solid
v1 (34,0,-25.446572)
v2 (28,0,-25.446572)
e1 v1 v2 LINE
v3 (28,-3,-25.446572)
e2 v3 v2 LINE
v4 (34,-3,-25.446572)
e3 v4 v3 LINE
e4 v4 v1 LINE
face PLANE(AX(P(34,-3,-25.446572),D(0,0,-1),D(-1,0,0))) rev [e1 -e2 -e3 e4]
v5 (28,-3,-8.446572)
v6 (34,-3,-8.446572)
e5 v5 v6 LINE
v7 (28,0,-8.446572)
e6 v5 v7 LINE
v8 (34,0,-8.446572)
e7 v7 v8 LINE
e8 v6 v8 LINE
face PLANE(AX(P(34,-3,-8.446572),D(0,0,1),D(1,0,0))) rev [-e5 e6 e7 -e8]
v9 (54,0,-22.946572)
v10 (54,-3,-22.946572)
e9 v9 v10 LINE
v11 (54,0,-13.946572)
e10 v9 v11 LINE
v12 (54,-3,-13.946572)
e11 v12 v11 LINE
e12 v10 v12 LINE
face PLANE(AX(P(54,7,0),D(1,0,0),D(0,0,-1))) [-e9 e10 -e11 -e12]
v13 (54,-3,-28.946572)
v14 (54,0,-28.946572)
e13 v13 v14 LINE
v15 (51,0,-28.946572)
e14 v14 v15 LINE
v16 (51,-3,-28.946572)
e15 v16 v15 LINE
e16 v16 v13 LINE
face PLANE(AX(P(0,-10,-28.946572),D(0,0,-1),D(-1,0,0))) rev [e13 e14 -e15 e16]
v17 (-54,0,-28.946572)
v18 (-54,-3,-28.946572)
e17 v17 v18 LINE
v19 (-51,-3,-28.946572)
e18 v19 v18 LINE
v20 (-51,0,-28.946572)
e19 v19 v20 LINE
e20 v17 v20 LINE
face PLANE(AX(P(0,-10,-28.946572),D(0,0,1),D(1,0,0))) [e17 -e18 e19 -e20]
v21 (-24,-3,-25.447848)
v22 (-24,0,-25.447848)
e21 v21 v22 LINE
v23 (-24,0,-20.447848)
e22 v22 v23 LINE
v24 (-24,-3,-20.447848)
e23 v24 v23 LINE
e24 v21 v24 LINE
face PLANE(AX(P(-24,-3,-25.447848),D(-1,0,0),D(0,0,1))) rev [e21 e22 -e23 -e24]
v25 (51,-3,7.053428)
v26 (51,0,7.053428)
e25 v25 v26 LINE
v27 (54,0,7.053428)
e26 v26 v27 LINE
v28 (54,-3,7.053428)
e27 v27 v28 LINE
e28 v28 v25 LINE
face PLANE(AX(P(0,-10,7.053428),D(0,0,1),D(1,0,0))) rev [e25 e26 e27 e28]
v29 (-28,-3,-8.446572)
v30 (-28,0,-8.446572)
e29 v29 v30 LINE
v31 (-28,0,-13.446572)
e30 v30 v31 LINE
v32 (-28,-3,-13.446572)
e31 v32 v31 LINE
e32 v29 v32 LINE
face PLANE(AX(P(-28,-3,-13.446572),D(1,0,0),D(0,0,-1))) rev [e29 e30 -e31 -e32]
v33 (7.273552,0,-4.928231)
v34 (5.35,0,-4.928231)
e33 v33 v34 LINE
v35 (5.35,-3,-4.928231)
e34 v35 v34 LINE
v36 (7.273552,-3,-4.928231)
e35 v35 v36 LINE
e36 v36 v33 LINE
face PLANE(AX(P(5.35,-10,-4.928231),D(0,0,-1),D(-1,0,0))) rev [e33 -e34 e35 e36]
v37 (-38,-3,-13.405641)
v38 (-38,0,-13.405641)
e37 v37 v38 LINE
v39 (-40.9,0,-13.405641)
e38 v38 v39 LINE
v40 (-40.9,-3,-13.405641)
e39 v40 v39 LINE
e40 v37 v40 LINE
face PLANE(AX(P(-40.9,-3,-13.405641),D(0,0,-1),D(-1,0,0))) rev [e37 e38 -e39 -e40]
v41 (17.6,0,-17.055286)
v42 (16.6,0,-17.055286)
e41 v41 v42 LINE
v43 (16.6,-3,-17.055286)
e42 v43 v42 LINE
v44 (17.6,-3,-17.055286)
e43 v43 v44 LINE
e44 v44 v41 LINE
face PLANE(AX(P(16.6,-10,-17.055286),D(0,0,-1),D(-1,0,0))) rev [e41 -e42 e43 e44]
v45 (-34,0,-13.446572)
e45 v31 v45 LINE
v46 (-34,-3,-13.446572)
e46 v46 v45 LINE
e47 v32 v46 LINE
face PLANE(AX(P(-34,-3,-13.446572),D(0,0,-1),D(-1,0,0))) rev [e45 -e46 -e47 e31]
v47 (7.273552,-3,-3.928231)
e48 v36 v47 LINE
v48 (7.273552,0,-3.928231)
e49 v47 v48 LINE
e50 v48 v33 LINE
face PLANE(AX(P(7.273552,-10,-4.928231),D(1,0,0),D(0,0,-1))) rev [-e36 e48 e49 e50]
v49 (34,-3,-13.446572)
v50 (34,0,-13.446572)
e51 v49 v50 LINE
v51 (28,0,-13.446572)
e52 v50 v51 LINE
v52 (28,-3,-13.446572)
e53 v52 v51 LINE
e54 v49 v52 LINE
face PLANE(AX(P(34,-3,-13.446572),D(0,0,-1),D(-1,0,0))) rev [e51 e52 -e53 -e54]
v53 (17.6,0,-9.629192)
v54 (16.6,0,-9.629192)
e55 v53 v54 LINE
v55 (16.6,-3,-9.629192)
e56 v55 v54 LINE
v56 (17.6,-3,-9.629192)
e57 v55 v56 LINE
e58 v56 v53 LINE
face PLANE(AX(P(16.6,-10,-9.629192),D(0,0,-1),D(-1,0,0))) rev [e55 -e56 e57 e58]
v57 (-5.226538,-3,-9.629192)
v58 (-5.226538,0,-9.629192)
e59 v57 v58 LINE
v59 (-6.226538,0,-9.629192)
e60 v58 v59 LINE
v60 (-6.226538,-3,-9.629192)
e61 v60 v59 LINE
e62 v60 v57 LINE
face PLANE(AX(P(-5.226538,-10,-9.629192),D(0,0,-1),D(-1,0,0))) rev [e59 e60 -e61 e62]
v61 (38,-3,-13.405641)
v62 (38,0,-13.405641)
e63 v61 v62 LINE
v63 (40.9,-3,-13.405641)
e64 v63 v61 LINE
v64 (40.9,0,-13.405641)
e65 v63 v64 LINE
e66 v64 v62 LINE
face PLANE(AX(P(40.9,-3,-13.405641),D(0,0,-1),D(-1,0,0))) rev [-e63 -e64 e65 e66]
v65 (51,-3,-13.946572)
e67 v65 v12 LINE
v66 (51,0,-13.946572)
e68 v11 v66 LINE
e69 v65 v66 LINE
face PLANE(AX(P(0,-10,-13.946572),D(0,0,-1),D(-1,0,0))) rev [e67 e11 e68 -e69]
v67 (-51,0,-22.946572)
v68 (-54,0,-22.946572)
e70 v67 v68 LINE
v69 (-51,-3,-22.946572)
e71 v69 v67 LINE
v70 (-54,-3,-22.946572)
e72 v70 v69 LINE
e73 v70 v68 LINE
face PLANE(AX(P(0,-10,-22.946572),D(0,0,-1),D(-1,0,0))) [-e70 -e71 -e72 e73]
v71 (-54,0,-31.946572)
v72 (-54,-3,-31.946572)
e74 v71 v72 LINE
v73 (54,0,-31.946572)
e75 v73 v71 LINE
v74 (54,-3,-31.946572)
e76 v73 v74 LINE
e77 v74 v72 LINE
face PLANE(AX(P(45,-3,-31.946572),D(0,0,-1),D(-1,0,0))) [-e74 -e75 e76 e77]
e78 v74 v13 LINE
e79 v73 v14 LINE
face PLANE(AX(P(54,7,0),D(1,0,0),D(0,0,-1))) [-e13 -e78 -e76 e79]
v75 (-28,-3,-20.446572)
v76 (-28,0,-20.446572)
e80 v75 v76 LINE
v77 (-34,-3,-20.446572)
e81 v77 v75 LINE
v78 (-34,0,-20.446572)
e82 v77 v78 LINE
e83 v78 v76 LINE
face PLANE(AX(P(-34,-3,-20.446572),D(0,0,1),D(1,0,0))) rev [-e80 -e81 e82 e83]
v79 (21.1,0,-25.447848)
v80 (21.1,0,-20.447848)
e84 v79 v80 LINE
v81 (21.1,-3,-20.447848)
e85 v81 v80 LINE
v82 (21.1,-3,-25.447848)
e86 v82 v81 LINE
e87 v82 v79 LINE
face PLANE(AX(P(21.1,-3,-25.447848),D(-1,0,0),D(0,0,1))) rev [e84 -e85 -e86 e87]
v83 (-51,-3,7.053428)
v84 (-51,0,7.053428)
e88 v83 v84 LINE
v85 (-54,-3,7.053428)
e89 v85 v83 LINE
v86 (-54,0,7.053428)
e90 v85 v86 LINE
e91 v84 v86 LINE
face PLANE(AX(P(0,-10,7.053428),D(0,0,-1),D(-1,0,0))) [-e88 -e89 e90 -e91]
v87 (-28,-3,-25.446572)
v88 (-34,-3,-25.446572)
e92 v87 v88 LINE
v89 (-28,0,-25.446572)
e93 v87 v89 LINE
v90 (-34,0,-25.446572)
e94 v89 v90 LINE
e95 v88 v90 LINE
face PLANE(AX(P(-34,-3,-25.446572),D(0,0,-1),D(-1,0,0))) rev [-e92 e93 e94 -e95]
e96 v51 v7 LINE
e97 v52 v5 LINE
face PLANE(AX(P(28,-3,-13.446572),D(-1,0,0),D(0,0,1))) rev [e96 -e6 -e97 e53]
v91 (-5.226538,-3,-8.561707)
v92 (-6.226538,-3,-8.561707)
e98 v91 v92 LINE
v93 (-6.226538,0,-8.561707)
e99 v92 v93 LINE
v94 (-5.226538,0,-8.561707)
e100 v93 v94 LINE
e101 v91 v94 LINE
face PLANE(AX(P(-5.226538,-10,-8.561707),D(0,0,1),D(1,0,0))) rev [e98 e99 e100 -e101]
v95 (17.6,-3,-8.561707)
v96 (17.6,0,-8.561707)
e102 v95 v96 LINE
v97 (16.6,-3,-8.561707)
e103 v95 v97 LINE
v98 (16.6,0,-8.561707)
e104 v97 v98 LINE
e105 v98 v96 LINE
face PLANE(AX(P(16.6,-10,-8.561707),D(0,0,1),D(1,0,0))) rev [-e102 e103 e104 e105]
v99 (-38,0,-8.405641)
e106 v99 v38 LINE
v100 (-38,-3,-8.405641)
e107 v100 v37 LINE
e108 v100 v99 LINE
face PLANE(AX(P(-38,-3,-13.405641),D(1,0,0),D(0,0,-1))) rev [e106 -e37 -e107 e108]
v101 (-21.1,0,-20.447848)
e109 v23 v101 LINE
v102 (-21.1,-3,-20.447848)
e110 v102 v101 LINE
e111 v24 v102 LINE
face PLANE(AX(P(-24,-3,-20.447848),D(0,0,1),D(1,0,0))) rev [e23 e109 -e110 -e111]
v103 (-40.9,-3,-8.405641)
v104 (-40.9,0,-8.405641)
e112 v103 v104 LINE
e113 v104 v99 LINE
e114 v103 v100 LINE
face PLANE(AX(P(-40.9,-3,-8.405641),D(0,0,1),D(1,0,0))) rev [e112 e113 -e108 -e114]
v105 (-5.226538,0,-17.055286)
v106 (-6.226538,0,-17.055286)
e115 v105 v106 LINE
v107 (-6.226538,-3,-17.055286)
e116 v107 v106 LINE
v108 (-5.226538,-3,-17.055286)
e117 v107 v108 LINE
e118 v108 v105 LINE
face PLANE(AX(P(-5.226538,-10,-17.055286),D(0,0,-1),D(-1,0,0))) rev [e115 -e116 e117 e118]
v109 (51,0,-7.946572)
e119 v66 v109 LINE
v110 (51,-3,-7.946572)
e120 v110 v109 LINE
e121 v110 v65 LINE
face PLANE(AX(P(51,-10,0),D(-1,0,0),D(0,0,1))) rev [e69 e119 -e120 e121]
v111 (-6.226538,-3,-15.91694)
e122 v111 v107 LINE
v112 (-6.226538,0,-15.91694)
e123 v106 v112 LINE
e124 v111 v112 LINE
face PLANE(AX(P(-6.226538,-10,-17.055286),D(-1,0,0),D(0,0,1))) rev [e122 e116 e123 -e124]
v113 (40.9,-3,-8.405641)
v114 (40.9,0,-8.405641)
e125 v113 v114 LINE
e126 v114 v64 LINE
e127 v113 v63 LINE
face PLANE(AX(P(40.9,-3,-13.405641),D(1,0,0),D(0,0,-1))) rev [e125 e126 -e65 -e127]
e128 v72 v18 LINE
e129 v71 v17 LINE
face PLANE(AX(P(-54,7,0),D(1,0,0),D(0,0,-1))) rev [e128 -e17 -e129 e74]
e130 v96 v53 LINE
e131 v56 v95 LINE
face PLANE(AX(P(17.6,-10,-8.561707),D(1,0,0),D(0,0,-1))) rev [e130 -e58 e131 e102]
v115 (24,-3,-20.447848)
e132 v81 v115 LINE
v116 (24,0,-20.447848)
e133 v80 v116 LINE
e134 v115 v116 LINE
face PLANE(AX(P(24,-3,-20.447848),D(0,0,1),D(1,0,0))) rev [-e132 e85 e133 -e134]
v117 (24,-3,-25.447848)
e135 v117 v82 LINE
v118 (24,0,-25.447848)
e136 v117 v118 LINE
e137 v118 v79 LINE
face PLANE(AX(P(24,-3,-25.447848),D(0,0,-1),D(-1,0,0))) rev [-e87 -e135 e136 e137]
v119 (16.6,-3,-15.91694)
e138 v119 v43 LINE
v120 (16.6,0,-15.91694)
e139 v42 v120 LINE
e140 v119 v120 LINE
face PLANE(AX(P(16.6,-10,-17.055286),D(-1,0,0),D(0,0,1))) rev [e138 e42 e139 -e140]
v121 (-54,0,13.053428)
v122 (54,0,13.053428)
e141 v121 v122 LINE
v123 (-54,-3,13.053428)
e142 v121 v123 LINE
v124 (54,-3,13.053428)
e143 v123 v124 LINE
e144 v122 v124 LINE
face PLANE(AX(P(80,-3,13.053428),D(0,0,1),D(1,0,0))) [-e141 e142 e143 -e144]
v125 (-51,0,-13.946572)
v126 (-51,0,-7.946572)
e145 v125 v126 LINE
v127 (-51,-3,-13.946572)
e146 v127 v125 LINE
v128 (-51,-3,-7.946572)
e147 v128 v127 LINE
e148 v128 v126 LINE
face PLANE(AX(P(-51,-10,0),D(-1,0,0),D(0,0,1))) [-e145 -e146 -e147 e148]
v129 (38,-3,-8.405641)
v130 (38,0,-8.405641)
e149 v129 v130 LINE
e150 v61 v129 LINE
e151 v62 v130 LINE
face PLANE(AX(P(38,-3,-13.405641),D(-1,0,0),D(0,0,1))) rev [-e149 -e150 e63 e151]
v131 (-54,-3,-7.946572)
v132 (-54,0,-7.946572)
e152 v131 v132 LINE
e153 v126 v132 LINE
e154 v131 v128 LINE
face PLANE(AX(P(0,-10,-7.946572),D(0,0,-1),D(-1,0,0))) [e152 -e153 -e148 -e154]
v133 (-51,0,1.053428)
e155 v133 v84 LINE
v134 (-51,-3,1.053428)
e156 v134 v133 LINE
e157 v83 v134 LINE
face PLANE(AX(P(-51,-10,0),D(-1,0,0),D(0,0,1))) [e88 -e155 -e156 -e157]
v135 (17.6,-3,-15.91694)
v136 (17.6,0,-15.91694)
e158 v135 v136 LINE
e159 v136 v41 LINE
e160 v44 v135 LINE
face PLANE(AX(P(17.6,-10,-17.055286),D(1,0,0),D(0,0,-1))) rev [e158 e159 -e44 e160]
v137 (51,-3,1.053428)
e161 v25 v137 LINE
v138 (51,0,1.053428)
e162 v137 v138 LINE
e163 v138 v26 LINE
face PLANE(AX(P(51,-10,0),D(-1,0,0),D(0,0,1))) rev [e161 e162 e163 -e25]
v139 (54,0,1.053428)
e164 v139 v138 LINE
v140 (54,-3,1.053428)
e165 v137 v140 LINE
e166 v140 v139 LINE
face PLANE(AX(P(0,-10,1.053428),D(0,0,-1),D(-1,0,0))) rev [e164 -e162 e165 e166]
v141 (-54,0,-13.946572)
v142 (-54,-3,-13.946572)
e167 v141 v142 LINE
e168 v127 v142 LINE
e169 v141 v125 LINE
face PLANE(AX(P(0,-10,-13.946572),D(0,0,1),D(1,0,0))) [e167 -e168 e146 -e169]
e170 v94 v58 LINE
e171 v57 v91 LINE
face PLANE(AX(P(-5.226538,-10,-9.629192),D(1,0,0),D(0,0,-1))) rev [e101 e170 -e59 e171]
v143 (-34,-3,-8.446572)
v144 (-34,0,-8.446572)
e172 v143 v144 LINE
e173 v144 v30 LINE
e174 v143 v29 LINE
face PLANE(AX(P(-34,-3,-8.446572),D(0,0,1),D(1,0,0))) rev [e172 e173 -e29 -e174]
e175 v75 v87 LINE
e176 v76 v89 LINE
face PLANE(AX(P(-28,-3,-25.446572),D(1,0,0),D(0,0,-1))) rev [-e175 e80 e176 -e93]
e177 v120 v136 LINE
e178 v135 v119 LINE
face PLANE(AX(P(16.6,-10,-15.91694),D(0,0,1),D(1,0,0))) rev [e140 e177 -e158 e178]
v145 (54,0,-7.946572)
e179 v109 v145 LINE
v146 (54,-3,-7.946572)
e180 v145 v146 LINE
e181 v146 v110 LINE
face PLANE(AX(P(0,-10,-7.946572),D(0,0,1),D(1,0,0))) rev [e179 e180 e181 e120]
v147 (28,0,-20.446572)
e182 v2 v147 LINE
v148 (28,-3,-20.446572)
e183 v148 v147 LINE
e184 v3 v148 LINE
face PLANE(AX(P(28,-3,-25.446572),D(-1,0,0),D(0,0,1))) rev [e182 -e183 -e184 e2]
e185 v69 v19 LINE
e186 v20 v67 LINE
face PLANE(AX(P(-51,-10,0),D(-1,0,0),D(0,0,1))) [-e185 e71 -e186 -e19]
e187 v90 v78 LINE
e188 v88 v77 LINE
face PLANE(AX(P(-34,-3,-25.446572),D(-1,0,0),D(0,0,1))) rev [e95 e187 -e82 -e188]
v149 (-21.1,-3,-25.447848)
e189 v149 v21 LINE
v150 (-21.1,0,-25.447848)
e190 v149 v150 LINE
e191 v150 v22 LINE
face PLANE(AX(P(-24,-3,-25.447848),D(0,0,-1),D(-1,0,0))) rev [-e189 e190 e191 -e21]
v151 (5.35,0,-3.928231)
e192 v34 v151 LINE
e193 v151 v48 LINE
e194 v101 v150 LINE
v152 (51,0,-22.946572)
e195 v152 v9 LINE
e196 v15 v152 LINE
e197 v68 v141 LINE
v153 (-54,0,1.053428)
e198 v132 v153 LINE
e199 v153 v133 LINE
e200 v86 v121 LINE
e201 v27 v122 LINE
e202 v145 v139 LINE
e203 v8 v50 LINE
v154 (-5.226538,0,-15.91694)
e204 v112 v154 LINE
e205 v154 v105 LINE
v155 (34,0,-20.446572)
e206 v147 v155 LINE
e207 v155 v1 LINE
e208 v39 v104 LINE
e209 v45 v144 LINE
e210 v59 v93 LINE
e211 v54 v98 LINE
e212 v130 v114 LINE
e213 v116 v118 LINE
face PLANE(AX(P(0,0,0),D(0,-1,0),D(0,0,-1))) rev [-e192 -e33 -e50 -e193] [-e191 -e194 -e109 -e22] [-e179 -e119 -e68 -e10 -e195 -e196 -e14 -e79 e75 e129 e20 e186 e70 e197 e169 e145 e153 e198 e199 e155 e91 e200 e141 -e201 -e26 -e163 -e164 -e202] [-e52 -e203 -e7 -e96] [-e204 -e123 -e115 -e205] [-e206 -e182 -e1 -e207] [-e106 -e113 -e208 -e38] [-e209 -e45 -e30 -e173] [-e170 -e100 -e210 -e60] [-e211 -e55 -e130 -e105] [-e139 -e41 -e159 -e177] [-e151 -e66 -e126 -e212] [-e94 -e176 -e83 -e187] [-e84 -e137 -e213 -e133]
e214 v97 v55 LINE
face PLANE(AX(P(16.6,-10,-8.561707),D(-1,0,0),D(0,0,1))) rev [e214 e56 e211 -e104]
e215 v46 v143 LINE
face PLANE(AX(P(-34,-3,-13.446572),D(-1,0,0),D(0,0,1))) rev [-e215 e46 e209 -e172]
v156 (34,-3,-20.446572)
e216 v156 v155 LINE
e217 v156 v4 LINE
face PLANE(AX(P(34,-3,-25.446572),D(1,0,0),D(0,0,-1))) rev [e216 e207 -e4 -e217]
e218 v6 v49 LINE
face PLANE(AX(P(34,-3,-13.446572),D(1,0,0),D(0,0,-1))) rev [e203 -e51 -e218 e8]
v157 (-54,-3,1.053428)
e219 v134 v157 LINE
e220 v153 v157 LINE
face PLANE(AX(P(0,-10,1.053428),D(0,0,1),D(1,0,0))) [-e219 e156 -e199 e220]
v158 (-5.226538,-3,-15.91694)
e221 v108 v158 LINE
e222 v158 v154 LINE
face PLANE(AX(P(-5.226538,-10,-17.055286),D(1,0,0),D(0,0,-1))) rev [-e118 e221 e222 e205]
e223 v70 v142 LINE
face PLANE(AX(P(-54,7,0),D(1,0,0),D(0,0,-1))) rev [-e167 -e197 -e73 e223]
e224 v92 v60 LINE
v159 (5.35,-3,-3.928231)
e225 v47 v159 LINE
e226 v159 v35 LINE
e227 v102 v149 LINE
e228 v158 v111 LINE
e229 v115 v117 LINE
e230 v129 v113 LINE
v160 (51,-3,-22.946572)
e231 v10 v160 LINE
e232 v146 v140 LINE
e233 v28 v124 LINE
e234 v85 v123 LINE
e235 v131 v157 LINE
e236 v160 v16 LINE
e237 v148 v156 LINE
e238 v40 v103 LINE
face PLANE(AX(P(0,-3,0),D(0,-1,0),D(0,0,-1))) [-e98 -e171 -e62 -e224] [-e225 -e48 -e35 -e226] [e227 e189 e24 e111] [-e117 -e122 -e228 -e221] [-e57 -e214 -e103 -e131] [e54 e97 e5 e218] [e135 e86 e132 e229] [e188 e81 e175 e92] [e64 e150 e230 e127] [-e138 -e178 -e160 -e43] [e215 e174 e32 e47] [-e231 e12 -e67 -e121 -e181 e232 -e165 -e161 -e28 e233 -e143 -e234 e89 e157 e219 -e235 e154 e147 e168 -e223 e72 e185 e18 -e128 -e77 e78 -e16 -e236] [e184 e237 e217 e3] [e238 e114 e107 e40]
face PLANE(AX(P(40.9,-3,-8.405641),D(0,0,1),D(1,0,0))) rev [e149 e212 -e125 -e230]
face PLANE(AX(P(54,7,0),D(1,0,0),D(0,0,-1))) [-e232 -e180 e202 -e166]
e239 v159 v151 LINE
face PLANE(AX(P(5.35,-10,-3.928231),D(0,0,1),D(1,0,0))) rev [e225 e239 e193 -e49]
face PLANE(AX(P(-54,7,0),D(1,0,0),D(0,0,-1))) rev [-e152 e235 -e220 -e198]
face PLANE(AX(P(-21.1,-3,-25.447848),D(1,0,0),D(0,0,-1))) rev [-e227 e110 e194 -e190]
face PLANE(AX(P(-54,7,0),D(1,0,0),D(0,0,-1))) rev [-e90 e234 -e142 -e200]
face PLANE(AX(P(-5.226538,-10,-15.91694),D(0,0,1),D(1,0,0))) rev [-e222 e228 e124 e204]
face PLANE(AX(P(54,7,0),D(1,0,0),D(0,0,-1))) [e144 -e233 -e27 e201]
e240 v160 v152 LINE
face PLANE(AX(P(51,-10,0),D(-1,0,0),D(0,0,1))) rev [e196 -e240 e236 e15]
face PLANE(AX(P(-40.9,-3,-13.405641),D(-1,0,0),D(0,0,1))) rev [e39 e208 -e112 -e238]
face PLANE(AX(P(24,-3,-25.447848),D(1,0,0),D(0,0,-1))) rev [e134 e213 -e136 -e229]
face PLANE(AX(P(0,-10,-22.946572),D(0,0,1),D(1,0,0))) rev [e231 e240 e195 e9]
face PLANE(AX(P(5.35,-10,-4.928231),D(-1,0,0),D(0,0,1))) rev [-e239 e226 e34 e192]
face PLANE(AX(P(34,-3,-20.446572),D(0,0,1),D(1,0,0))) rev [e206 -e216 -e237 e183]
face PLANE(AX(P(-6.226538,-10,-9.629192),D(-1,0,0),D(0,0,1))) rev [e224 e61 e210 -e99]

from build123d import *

# Parameters (mm, degrees)
SKETCH1_W          = 2.9
SKETCH1_H          = 5
SKETCH1_W_2        = 6
BASE_FLANGE1_DEPTH = 3
SKETCH25_W         = 9
SKETCH25_H         = 9.641148945
SKETCH25_W_2       = 7.205840792
CUT_EXTRUDE2_DEPTH = 10
SKETCH31_W         = 3
SKETCH31_H         = 6
CUT_EXTRUDE3_DEPTH = 10
SKETCH32_W         = 1
SKETCH32_H         = 1.138346555
SKETCH32_H_2       = 1.067484408
SKETCH32_W_2       = 1.923552289
SKETCH32_H_3       = 1
CUT_EXTRUDE4_DEPTH = 10


# Sheet-metal steps are written as plain solids
with BuildPart() as part:
    # Sketch1 → Base-Flange1 (new body)
    with BuildSketch(Plane(origin=(0, 0, 0), x_dir=(1, 0, 0), z_dir=(0, 1, 0))):
        Polygon((-80, 31.946571622), (-80, -13.053428378), (80, -13.053428378), (80, 31.946571622), (80, 41.587720567), (45, 41.587720567), (45, 31.946571622), (-45, 31.946571622), (-45, 41.587720567), (-80, 41.587720567), align=None)
        with Locations((-39.45, 10.905641405)):
            Rectangle(SKETCH1_W, SKETCH1_H, mode=Mode.SUBTRACT)
        with Locations((-22.55, 22.947848405)):
            Rectangle(SKETCH1_W, SKETCH1_H, mode=Mode.SUBTRACT)
        with Locations((-31, 22.946571622)):
            Rectangle(SKETCH1_W_2, SKETCH1_H, mode=Mode.SUBTRACT)
        with Locations((-31, 10.946571622)):
            Rectangle(SKETCH1_W_2, SKETCH1_H, mode=Mode.SUBTRACT)
        with Locations((31, 10.946571622)):
            Rectangle(SKETCH1_W_2, SKETCH1_H, mode=Mode.SUBTRACT)
        with Locations((31, 22.946571622)):
            Rectangle(SKETCH1_W_2, SKETCH1_H, mode=Mode.SUBTRACT)
        with Locations((22.55, 22.947848405)):
            Rectangle(SKETCH1_W, SKETCH1_H, mode=Mode.SUBTRACT)
        with Locations((39.45, 10.905641405)):
            Rectangle(SKETCH1_W, SKETCH1_H, mode=Mode.SUBTRACT)
    extrude(amount=-BASE_FLANGE1_DEPTH)

    # Sketch25 → Cut-Extrude2 (cut)
    with BuildSketch(Plane.XZ.offset(3)):
        Polygon((80, 13.053428378), (54, 13.053428378), (54, -31.946571622), (61.205840792, -31.946571622), (61.205840792, -41.587720567), (80, -41.587720567), align=None)
        with Locations((49.5, -36.767146095)):
            Rectangle(SKETCH25_W, SKETCH25_H)
        with Locations((57.602920396, -36.767146095)):
            Rectangle(SKETCH25_W_2, SKETCH25_H)
        with Locations((-49.5, -36.767146095)):
            Rectangle(SKETCH25_W, SKETCH25_H)
        with Locations((-57.602920396, -36.767146095)):
            Rectangle(SKETCH25_W_2, SKETCH25_H)
        Polygon((-54, -31.946571622), (-54, 13.053428378), (-80, 13.053428378), (-80, -41.587720567), (-61.205840792, -41.587720567), (-61.205840792, -31.946571622), align=None)
    extrude(amount=-CUT_EXTRUDE2_DEPTH, mode=Mode.SUBTRACT)

    # Sketch31 → Cut-Extrude3 (cut)
    with BuildSketch(Plane(origin=(0, 0, 0), x_dir=(1, 0, 0), z_dir=(0, 1, 0))):
        with Locations((52.5, 25.946571622)):
            Rectangle(SKETCH31_W, SKETCH31_H)
        with Locations((52.5, 10.946571622)):
            Rectangle(SKETCH31_W, SKETCH31_H)
        with Locations((52.5, -4.053428378)):
            Rectangle(SKETCH31_W, SKETCH31_H)
        with Locations((-52.5, 25.946571622)):
            Rectangle(SKETCH31_W, SKETCH31_H)
        with Locations((-52.5, 10.946571622)):
            Rectangle(SKETCH31_W, SKETCH31_H)
        with Locations((-52.5, -4.053428378)):
            Rectangle(SKETCH31_W, SKETCH31_H)
    extrude(amount=-CUT_EXTRUDE3_DEPTH, mode=Mode.SUBTRACT)

    # Sketch32 → Cut-Extrude4 (cut)
    with BuildSketch(Plane(origin=(0, 0, 0), x_dir=(1, 0, 0), z_dir=(0, 1, 0))):
        with Locations((-5.726537828, 16.486113061)):
            Rectangle(SKETCH32_W, SKETCH32_H)
        with Locations((-5.726537828, 9.095449689)):
            Rectangle(SKETCH32_W, SKETCH32_H_2)
        with Locations((17.1, 16.486113061)):
            Rectangle(SKETCH32_W, SKETCH32_H)
        with Locations((17.1, 9.095449689)):
            Rectangle(SKETCH32_W, SKETCH32_H_2)
        with Locations((6.311776145, 4.428231045)):
            Rectangle(SKETCH32_W_2, SKETCH32_H_3)
    extrude(amount=-CUT_EXTRUDE4_DEPTH, mode=Mode.SUBTRACT)


solid = part.part
